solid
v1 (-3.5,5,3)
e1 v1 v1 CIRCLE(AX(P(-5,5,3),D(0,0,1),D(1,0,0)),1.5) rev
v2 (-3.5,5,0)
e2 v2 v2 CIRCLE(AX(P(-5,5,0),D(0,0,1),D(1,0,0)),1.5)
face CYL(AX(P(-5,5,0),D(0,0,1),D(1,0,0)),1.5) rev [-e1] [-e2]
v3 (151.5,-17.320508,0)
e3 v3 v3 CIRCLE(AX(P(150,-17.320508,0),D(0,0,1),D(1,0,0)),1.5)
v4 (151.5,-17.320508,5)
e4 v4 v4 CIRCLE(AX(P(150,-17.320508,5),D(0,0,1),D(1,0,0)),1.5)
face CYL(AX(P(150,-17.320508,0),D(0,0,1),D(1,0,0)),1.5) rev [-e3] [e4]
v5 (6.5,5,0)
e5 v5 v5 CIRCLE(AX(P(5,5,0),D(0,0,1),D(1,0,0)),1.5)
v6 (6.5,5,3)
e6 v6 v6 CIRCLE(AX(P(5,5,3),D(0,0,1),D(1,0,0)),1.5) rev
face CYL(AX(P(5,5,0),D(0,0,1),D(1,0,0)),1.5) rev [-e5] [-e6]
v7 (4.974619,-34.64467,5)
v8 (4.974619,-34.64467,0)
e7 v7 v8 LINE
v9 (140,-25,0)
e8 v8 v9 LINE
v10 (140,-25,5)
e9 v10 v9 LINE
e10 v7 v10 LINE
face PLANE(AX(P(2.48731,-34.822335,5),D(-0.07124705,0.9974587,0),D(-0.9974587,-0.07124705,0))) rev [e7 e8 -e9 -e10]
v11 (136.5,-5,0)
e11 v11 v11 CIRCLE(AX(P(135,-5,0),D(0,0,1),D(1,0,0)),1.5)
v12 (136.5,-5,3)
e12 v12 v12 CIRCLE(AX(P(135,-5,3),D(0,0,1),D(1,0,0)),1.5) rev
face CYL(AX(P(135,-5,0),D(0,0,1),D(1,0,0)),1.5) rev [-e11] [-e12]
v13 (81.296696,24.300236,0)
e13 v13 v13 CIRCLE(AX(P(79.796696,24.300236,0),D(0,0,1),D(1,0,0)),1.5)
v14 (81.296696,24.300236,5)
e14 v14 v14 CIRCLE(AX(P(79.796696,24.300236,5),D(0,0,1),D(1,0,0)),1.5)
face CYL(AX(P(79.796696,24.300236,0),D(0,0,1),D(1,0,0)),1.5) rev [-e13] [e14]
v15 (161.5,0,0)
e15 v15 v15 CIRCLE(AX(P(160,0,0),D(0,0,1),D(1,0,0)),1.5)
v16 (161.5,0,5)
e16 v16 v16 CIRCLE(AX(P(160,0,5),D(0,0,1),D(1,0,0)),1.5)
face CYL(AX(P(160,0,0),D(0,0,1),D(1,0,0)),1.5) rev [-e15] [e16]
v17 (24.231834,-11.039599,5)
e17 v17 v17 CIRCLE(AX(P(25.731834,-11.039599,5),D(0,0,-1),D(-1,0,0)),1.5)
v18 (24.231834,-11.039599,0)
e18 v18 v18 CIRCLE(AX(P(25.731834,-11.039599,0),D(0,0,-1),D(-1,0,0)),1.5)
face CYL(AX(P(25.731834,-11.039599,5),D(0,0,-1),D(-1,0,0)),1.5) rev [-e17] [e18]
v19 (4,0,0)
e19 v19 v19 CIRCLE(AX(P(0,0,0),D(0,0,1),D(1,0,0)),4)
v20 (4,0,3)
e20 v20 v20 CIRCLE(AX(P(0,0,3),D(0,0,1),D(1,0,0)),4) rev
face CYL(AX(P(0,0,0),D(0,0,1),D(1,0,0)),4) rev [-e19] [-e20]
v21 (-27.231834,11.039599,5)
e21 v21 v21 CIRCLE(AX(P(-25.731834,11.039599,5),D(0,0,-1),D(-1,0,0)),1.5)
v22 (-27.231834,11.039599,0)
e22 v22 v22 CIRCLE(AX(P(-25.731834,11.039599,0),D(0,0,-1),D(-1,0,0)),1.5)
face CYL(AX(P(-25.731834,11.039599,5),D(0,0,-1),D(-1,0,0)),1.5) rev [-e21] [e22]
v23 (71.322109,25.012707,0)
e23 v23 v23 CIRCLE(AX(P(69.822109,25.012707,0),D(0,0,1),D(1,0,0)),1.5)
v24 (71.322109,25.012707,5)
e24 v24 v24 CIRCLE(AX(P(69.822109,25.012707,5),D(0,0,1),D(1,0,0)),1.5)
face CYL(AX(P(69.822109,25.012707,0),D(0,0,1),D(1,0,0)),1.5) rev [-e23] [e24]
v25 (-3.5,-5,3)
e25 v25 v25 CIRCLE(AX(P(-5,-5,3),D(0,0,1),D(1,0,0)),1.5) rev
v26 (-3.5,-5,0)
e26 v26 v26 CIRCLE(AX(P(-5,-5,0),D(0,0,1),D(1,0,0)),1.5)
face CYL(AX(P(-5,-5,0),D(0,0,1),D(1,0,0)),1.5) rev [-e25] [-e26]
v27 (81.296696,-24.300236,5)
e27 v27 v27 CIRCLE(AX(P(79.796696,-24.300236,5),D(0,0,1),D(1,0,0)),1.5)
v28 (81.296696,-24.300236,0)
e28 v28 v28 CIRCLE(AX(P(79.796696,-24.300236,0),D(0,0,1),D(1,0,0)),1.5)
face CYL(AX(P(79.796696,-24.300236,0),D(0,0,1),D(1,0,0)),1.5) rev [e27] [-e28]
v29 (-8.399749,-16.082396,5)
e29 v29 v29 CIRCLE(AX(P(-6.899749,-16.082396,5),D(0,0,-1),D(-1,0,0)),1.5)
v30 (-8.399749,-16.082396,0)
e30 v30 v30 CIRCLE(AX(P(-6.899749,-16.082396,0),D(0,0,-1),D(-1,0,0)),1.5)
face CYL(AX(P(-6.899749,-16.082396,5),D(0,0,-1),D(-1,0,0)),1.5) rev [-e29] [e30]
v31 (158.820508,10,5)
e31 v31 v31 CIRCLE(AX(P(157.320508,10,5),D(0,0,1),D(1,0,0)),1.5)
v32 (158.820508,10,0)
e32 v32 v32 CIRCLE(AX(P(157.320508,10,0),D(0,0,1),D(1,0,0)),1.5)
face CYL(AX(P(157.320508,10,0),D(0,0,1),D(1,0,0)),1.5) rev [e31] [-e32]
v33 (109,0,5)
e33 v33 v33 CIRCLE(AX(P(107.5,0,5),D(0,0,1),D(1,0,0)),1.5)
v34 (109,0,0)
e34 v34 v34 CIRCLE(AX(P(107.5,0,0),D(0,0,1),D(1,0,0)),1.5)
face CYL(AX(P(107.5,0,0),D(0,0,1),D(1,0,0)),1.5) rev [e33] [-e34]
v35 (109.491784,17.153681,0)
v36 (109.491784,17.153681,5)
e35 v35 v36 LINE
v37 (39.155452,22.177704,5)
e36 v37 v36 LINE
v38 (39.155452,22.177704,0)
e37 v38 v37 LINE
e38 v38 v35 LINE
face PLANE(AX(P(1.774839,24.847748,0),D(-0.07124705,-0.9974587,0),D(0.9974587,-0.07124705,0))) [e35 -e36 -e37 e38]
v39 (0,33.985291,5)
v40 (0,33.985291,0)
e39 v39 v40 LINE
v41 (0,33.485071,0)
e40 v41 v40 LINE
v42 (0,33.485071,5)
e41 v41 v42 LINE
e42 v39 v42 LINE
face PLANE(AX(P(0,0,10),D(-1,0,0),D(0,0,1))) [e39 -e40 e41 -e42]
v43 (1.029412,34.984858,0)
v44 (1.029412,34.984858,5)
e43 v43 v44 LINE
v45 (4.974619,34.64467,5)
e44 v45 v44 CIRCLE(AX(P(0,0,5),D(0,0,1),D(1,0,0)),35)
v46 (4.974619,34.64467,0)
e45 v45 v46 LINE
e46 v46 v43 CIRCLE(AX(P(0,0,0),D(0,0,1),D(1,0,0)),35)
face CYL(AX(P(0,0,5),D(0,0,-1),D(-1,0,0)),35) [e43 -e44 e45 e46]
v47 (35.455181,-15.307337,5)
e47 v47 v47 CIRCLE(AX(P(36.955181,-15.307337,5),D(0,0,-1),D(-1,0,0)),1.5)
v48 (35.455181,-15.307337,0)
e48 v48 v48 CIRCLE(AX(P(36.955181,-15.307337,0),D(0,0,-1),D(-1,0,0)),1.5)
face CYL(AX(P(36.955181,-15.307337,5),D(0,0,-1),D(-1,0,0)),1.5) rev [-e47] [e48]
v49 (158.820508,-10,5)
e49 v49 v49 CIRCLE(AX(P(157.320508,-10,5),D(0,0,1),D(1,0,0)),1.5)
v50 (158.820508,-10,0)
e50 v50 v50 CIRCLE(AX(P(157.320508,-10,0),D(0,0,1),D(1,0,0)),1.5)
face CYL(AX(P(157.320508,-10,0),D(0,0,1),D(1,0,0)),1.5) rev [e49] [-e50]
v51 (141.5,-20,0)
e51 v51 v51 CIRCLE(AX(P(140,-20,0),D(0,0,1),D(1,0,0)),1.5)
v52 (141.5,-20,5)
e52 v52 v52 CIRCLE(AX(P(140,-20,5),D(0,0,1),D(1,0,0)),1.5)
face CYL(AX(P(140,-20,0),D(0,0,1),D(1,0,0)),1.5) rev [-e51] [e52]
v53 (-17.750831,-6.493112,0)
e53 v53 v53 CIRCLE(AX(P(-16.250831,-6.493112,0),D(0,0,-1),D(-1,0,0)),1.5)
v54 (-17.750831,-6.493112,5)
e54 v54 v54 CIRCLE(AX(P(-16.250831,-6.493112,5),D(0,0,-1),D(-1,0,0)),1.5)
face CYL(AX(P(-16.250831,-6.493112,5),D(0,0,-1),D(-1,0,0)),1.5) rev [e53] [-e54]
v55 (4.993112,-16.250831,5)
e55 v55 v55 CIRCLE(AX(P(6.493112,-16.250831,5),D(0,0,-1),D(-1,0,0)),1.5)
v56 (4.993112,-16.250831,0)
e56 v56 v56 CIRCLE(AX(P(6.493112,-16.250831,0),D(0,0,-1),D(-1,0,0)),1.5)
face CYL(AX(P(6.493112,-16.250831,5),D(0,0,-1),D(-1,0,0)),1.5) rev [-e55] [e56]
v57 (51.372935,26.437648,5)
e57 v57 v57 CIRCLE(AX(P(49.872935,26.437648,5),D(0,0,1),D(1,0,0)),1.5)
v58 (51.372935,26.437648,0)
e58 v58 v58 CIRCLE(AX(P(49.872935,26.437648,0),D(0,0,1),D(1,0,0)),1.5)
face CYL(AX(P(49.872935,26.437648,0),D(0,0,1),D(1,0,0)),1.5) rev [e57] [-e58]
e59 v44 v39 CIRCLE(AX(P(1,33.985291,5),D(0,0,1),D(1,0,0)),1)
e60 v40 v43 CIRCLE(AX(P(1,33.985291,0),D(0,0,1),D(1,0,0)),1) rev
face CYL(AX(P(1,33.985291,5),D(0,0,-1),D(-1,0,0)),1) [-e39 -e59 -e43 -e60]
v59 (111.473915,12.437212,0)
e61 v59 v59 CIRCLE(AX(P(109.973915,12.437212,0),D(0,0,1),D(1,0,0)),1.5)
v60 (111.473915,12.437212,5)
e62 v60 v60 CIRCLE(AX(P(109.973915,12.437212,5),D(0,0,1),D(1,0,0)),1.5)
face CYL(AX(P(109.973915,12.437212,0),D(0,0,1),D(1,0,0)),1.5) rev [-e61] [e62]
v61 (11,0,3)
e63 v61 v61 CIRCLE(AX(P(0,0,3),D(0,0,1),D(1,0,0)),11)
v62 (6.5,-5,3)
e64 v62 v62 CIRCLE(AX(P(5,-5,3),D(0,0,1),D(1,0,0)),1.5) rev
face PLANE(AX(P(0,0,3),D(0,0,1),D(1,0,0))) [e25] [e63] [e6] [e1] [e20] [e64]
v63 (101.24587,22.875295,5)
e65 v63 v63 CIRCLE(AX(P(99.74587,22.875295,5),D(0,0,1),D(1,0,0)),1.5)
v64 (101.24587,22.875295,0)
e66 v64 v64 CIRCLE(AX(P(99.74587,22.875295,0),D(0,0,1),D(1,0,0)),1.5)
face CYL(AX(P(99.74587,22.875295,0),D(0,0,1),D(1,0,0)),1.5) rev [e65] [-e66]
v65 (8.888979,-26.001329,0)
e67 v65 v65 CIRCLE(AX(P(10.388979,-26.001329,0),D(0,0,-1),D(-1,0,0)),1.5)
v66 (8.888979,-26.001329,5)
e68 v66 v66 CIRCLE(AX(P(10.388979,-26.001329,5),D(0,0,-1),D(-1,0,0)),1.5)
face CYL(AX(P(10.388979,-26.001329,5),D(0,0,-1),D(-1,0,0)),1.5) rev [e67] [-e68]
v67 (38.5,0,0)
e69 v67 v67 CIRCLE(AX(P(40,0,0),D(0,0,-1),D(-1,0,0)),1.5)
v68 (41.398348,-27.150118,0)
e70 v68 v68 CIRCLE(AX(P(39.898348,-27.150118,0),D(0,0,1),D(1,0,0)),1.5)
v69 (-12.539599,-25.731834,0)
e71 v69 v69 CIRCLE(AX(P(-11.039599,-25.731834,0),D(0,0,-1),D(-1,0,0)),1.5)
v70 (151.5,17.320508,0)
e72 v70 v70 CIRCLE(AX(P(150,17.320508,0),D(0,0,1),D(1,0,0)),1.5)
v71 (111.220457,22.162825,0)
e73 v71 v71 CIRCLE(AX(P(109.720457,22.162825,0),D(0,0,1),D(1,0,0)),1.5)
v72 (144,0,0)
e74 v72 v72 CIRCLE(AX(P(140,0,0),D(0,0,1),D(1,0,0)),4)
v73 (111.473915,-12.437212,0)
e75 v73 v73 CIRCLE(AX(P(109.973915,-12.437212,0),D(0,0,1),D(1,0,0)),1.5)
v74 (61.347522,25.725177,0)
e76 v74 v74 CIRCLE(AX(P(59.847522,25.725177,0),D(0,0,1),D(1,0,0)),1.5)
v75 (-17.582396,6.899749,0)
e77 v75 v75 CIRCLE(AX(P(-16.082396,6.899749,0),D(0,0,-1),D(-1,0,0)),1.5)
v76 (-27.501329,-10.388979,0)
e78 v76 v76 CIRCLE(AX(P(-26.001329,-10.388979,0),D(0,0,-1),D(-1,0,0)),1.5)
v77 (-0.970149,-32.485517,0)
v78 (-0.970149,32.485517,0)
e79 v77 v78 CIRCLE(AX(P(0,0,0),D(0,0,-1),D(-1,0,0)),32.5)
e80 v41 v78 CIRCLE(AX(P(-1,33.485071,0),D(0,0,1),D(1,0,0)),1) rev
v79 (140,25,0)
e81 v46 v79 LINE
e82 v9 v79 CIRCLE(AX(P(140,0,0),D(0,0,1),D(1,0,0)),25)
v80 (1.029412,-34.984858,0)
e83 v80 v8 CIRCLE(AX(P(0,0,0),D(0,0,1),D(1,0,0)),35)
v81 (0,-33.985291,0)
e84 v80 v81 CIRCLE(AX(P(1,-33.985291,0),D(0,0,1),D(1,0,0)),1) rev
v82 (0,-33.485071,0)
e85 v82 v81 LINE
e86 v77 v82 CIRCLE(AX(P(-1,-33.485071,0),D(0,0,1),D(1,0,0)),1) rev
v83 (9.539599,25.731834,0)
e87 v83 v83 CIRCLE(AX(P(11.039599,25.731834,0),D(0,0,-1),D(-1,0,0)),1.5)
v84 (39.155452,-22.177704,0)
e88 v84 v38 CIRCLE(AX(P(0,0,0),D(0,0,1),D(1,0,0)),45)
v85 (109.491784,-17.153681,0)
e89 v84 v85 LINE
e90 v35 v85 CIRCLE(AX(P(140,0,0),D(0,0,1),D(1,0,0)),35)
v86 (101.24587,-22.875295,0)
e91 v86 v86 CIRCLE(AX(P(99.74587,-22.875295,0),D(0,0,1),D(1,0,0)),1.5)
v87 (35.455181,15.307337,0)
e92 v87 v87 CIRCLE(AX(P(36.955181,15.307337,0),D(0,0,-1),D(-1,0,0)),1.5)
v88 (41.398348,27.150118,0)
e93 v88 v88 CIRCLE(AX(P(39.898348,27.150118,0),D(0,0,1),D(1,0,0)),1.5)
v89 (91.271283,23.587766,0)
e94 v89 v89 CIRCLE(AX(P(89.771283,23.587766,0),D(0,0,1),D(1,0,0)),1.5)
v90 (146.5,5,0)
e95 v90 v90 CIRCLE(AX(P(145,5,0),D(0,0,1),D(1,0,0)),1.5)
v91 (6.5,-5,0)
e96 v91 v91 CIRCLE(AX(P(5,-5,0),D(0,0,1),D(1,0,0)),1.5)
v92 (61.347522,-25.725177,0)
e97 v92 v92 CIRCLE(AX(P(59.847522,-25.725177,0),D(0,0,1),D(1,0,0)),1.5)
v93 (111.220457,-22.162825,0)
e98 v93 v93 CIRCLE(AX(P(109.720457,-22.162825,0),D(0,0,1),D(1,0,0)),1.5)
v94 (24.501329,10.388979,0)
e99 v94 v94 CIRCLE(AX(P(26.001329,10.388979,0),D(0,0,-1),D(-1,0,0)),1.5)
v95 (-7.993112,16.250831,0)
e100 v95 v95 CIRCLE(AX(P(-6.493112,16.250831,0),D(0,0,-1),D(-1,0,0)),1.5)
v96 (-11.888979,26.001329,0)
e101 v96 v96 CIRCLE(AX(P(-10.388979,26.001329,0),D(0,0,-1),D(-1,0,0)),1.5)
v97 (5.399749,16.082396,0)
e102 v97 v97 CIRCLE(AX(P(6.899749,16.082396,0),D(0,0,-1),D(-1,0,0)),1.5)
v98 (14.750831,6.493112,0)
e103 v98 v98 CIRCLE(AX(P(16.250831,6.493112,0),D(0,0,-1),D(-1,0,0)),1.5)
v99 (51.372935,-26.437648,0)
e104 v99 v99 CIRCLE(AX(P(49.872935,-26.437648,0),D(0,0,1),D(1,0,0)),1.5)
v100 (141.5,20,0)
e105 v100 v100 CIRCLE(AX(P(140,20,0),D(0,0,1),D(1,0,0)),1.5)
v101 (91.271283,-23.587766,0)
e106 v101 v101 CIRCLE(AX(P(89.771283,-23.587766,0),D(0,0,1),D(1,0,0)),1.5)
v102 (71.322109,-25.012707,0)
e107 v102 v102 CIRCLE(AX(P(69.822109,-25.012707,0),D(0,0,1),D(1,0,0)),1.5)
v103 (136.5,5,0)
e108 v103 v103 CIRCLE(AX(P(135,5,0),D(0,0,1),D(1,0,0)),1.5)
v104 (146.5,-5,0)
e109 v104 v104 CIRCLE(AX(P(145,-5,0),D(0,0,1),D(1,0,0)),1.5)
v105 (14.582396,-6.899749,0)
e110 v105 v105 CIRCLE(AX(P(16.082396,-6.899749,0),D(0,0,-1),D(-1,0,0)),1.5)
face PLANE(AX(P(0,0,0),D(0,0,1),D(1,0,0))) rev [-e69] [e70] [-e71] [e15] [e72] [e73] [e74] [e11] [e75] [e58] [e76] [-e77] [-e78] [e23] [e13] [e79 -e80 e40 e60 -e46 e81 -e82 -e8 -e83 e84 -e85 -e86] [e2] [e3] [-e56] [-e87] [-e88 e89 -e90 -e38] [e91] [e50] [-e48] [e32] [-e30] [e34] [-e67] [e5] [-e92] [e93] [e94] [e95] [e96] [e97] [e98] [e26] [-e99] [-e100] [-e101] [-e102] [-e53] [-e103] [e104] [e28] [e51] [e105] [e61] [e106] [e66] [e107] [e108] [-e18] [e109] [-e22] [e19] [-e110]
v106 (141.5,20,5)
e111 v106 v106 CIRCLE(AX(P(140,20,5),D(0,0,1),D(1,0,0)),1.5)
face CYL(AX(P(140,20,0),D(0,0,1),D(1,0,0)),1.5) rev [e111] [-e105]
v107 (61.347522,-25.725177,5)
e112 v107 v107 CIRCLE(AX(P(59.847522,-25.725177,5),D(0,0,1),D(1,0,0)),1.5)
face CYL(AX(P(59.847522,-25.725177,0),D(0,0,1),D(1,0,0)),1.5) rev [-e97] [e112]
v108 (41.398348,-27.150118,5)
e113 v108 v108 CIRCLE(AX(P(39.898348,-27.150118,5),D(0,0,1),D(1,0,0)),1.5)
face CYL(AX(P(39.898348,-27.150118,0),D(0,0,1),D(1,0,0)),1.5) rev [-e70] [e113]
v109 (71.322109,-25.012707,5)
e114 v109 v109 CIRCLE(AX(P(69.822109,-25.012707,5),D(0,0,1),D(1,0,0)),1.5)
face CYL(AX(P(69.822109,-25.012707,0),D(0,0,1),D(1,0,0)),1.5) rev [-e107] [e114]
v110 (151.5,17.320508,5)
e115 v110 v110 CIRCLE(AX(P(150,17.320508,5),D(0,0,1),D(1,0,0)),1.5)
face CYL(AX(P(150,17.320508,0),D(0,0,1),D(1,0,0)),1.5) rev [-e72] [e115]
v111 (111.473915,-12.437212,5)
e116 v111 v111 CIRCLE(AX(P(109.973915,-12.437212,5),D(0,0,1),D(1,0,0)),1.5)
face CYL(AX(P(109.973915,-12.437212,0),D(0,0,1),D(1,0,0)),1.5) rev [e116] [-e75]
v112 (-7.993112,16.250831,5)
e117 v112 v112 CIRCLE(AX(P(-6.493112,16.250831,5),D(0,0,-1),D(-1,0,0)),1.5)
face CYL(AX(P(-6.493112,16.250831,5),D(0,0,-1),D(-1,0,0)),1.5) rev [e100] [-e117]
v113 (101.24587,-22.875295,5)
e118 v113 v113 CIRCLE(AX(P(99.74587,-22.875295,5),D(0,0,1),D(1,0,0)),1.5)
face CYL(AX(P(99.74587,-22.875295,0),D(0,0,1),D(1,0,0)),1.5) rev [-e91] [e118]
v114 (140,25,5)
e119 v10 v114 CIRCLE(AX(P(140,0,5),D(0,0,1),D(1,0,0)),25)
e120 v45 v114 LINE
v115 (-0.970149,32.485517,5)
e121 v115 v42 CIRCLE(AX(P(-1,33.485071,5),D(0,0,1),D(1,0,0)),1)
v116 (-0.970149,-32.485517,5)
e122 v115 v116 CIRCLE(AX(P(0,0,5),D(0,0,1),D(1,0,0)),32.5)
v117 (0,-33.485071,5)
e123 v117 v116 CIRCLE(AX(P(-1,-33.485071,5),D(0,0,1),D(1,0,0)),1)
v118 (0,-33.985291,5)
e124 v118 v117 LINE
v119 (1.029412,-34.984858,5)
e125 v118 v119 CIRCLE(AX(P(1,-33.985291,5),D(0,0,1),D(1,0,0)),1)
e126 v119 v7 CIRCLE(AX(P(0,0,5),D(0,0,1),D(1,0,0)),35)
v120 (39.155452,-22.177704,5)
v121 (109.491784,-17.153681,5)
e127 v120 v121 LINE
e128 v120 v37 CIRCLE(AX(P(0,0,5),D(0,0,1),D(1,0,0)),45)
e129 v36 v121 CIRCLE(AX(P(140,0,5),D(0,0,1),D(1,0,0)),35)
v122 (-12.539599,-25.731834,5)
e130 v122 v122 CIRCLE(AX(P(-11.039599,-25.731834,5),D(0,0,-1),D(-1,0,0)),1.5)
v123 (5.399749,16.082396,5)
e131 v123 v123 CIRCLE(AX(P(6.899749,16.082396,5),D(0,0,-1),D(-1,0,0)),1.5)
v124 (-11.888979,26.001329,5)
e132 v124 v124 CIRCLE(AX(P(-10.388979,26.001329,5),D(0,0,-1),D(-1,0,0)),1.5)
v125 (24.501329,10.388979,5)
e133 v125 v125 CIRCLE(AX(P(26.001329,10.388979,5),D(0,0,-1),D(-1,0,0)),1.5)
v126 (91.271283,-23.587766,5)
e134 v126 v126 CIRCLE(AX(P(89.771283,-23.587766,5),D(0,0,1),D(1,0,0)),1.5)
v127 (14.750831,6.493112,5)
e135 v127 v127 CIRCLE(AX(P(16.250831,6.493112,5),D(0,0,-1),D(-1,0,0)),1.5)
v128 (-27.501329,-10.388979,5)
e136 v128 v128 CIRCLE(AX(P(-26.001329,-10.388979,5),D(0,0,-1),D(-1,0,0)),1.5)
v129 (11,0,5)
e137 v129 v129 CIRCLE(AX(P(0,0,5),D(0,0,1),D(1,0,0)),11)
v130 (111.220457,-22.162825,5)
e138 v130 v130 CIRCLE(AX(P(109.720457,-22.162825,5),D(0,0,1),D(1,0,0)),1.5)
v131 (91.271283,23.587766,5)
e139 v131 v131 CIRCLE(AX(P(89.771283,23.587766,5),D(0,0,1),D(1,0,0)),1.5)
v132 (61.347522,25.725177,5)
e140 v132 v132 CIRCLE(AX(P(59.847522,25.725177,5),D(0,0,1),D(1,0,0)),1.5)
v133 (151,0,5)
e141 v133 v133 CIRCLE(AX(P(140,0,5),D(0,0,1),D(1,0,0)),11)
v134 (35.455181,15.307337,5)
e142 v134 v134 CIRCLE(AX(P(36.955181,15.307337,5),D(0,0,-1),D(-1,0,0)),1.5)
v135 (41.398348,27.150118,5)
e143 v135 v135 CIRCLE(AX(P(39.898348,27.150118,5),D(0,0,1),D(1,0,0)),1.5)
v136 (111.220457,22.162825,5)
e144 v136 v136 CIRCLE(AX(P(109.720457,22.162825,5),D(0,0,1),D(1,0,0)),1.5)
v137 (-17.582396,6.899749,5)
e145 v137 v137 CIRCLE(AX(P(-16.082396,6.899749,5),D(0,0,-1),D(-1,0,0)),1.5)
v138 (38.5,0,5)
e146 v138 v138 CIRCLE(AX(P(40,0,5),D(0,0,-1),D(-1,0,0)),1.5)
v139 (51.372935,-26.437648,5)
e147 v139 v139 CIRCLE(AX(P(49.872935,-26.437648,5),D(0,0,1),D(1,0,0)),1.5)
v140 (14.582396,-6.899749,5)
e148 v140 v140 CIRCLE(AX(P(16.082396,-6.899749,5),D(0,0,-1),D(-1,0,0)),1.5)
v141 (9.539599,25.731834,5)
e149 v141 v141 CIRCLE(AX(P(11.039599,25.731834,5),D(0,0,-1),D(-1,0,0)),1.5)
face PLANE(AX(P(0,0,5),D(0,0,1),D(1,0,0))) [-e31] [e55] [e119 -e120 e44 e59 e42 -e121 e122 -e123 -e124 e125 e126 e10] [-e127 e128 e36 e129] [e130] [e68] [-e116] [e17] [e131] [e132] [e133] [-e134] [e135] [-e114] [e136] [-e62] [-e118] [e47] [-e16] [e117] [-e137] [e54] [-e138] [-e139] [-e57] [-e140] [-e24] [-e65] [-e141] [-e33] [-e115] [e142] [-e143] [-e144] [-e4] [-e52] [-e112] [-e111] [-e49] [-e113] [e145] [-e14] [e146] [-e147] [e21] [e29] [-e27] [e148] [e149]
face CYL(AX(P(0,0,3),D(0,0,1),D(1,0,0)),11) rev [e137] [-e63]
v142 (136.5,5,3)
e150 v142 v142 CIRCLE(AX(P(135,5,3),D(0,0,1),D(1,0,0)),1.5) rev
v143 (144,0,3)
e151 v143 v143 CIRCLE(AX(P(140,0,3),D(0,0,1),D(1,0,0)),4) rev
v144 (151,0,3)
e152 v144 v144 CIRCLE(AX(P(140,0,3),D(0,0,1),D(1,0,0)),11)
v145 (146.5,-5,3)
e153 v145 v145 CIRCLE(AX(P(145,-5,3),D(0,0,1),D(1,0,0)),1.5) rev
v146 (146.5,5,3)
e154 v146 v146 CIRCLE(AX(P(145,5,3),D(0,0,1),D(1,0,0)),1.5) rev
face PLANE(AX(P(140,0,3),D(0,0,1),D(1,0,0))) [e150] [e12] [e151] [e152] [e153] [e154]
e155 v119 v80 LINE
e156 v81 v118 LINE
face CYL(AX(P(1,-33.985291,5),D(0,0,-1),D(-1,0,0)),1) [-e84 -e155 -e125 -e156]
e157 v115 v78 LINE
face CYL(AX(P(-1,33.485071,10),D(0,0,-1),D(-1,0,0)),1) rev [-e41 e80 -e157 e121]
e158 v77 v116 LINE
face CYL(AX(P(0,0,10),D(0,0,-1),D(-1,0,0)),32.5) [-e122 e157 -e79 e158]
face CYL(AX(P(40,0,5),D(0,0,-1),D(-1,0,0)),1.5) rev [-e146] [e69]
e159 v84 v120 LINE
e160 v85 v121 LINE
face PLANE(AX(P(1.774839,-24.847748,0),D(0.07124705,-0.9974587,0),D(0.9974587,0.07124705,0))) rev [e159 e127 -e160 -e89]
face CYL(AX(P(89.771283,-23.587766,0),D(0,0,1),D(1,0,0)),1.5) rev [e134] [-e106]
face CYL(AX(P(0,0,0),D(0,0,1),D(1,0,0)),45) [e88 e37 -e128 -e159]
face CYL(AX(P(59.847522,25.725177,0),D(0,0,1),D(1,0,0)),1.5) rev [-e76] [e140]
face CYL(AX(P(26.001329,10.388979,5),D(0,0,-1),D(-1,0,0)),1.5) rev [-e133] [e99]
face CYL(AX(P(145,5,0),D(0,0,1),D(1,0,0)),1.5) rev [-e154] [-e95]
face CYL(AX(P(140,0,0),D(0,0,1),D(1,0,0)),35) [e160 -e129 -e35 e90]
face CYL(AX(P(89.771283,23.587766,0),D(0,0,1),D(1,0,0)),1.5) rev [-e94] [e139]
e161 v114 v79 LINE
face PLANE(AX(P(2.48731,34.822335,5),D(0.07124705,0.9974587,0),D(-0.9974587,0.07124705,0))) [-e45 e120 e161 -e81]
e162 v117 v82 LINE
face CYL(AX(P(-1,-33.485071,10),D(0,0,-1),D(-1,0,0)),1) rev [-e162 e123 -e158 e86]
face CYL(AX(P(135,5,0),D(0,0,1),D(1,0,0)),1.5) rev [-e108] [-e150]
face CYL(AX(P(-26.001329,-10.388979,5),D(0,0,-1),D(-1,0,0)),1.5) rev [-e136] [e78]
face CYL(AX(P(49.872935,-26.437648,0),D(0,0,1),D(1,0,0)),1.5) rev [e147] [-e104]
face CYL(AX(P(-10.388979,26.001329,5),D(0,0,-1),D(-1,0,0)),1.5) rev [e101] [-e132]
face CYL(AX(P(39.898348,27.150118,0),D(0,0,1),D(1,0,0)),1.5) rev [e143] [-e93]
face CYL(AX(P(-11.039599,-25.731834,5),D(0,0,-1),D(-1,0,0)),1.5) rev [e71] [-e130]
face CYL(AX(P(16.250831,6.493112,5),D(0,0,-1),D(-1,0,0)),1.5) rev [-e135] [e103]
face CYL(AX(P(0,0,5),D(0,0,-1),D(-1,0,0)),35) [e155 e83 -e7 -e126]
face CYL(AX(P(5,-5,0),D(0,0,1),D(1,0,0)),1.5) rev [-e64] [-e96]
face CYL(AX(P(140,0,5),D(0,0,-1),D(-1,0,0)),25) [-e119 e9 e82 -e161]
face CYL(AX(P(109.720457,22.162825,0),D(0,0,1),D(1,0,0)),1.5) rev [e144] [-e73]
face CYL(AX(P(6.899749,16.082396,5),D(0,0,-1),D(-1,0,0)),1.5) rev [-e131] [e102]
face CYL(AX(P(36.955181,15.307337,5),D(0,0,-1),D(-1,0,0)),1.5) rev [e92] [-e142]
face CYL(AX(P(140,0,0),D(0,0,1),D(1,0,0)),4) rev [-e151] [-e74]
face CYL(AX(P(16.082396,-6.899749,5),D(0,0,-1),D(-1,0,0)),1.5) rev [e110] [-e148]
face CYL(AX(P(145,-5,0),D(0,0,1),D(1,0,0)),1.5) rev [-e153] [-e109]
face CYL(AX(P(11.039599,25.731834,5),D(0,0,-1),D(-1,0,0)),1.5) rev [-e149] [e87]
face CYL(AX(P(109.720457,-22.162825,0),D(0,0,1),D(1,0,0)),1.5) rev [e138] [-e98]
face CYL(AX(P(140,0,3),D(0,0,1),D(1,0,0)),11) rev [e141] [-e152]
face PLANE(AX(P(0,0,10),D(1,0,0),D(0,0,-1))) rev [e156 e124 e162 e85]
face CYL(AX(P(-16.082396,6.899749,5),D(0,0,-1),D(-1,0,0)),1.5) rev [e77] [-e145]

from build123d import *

# Parameters (mm, degrees)
EXTRUDE_3_DEPTH      = 5
SKETCH_4_R           = 4
SKETCH_4_R_2         = 1.5
CUT_EXTRUDE_3_DEPTH  = 5
SKETCH_5_R           = 11
CUT_EXTRUDE_4_DEPTH  = 2
SKETCH_6_R           = 1.5
CUT_EXTRUDE_6_DEPTH  = 169.745370307
SKETCH_8_R           = 1.5
CUT_EXTRUDE_8_DEPTH  = 169.745370307
SKETCH_9_R           = 1.5
EXTRUDE_4_DEPTH      = 5
SKETCH_10_R          = 1.5
EXTRUDE_6_DEPTH      = 5
SKETCH_11_R          = 1.5
EXTRUDE_12_DEPTH     = 5
SKETCH_14_R          = 1.5
CUT_EXTRUDE_9_DEPTH  = 5
EXTRUDE_START        = -5
EXTRUDE_13_DEPTH     = 5
SKETCH_16_R          = 1.5
CUT_EXTRUDE_10_DEPTH = 5
EXTRUDE_14_DEPTH     = 5
SKETCH_19_R          = 1.5
EXTRUDE_15_DEPTH     = 5
SKETCH_20_R          = 1.5
CUT_EXTRUDE_11_DEPTH = 5
EXTRUDE_16_DEPTH     = 5
SKETCH_22_R          = 1.5
EXTRUDE_17_DEPTH     = 5
SKETCH_23_R          = 1.5
CUT_EXTRUDE_15_DEPTH = 5
SKETCH_24_R          = 1.5
EXTRUDE_21_DEPTH     = 5
EXTRUDE_22_DEPTH     = 5
CUT_EXTRUDE_START    = -10
CUT_EXTRUDE_16_DEPTH = 10
FILLET_5_R           = 1
FILLET_6_R           = 1
FILLET_7_R           = 1
FILLET_8_R           = 1


with BuildPart() as part:
    # 草图1 → 凸台-拉伸3 (new body)
    with BuildSketch(Plane.XY):
        with BuildLine():
            Line((140, 25), (0, 35))
            ThreePointArc((0, 35), (-35, 0), (0, -35))
            Line((0, -35), (140, -25))
            ThreePointArc((140, -25), (165, 0), (140, 25))
        make_face()
    extrude(amount=EXTRUDE_3_DEPTH)

    # 草图4 → 切除-拉伸3 (cut)
    with BuildSketch(Plane.XY.offset(5)):
        with Locations((140, 0)):
            Circle(SKETCH_4_R)
        Circle(SKETCH_4_R)
        with BuildLine():
            Line((-5, -3.5), (-5, -5))
            Line((-5, -5), (-3.5, -5))
            ThreePointArc((-3.5, -5), (-3.939339828, -3.939339828), (-5, -3.5))
        make_face()
        with BuildLine():
            Line((-3.5, -5), (-5, -5))
            Line((-5, -5), (-5, -3.5))
            ThreePointArc((-5, -3.5), (-6.060660172, -6.060660172), (-3.5, -5))
        make_face()
        with Locations((135, 5)):
            Circle(SKETCH_4_R_2)
        with Locations((135, -5)):
            Circle(SKETCH_4_R_2)
        with Locations((145, -5)):
            Circle(SKETCH_4_R_2)
        with Locations((145, 5)):
            Circle(SKETCH_4_R_2)
        with Locations((-5, 5)):
            Circle(SKETCH_4_R_2)
        with Locations((5, 5)):
            Circle(SKETCH_4_R_2)
        with Locations((5, -5)):
            Circle(SKETCH_4_R_2)
    extrude(amount=-CUT_EXTRUDE_3_DEPTH, mode=Mode.SUBTRACT)

    # 草图5 → 切除-拉伸4 (cut)
    with BuildSketch(Plane.XY.offset(5)):
        Circle(SKETCH_5_R)
        with Locations((140, 0)):
            Circle(SKETCH_5_R)
    extrude(amount=-CUT_EXTRUDE_4_DEPTH, mode=Mode.SUBTRACT)

    # 草图6 → 切除-拉伸6 (cut, through all)
    with BuildSketch(Plane.XY.offset(5)):
        with Locations((0, 30)):
            Circle(SKETCH_6_R)
        with Locations((15, 25.980762114)):
            Circle(SKETCH_6_R)
        with Locations((25.980762114, 15)):
            Circle(SKETCH_6_R)
        with Locations((30, 0)):
            Circle(SKETCH_6_R)
        with Locations((25.980762114, -15)):
            Circle(SKETCH_6_R)
        with Locations((15, -25.980762114)):
            Circle(SKETCH_6_R)
        with Locations((0, -30)):
            Circle(SKETCH_6_R)
        with Locations((-15, -25.980762114)):
            Circle(SKETCH_6_R)
        with Locations((-25.980762114, -15)):
            Circle(SKETCH_6_R)
        with Locations((-30, 0)):
            Circle(SKETCH_6_R)
        with Locations((-25.980762114, 15)):
            Circle(SKETCH_6_R)
        with Locations((-15, 25.980762114)):
            Circle(SKETCH_6_R)
        with Locations((140, 20)):
            Circle(SKETCH_6_R)
        with Locations((150, 17.320508076)):
            Circle(SKETCH_6_R)
        with Locations((157.320508076, 10)):
            Circle(SKETCH_6_R)
        with Locations((160, 0)):
            Circle(SKETCH_6_R)
        with Locations((157.320508076, -10)):
            Circle(SKETCH_6_R)
        with Locations((150, -17.320508076)):
            Circle(SKETCH_6_R)
        with Locations((140, -20)):
            Circle(SKETCH_6_R)
        with Locations((130, -17.320508076)):
            Circle(SKETCH_6_R)
        with Locations((122.679491924, -10)):
            Circle(SKETCH_6_R)
        with Locations((120, 0)):
            Circle(SKETCH_6_R)
        with Locations((122.679491924, 10)):
            Circle(SKETCH_6_R)
        with Locations((130, 17.320508076)):
            Circle(SKETCH_6_R)
    extrude(amount=-CUT_EXTRUDE_6_DEPTH, mode=Mode.SUBTRACT)

    # 草图8 → 切除-拉伸8 (cut, through all)
    with BuildSketch(Plane.XY.offset(5)):
        with BuildLine():
            ThreePointArc((35, 0), (32.752250408, -12.340587232), (26.297708958, -23.096114469))
            Line((26.297708958, -23.096114469), (121.06763386, -16.326834119))
            ThreePointArc((121.06763386, -16.326834119), (115, 0), (121.06763386, 16.326834119))
            Line((121.06763386, 16.326834119), (26.297708958, 23.096114469))
            ThreePointArc((26.297708958, 23.096114469), (32.752250408, 12.340587232), (35, 0))
        make_face()
        with BuildLine():
            ThreePointArc((41.39357706, -27.03057705), (39.791477418, -25.653929951), (38.401308325, -27.244310531))
            Line((38.401308325, -27.244310531), (41.39357706, -27.03057705))
        make_face()
        with BuildLine():
            Line((41.39357706, -27.03057705), (38.401308325, -27.244310531))
            ThreePointArc((38.401308325, -27.244310531), (39.945467513, -28.649377735), (41.398347993, -27.150118))
            ThreePointArc((41.398347993, -27.150118), (41.397154785, -27.090299942), (41.39357706, -27.03057705))
        make_face()
        with Locations((9.974586998, 29.2875295)):
            Circle(SKETCH_8_R)
        with Locations((19.949173997, 28.575059)):
            Circle(SKETCH_8_R)
        with Locations((29.923760995, 27.8625885)):
            Circle(SKETCH_8_R)
        with Locations((39.898347993, 27.150118)):
            Circle(SKETCH_8_R)
        with Locations((49.872934992, 26.437647501)):
            Circle(SKETCH_8_R)
        with Locations((59.84752199, 25.725177001)):
            Circle(SKETCH_8_R)
        with Locations((69.822108988, 25.012706501)):
            Circle(SKETCH_8_R)
        with Locations((89.771282985, 23.587765501)):
            Circle(SKETCH_8_R)
        with Locations((79.796695986, 24.300236001)):
            Circle(SKETCH_8_R)
        with Locations((99.745869983, 22.875295001)):
            Circle(SKETCH_8_R)
        with Locations((109.720456981, 22.162824501)):
            Circle(SKETCH_8_R)
        with Locations((119.69504398, 21.450354001)):
            Circle(SKETCH_8_R)
        with Locations((129.669630978, 20.737883502)):
            Circle(SKETCH_8_R)
        with Locations((129.669630978, -20.737883502)):
            Circle(SKETCH_8_R)
        with Locations((119.69504398, -21.450354001)):
            Circle(SKETCH_8_R)
        with Locations((109.720456981, -22.162824501)):
            Circle(SKETCH_8_R)
        with Locations((99.745869983, -22.875295001)):
            Circle(SKETCH_8_R)
        with Locations((89.771282985, -23.587765501)):
            Circle(SKETCH_8_R)
        with Locations((79.796695986, -24.300236001)):
            Circle(SKETCH_8_R)
        with Locations((69.822108988, -25.012706501)):
            Circle(SKETCH_8_R)
        with Locations((59.84752199, -25.725177001)):
            Circle(SKETCH_8_R)
        with Locations((49.872934992, -26.437647501)):
            Circle(SKETCH_8_R)
        with Locations((29.923760995, -27.8625885)):
            Circle(SKETCH_8_R)
        with Locations((19.949173997, -28.575059)):
            Circle(SKETCH_8_R)
        with Locations((9.974586998, -29.2875295)):
            Circle(SKETCH_8_R)
    extrude(amount=-CUT_EXTRUDE_8_DEPTH, mode=Mode.SUBTRACT)

    # 草图9 → 凸台-拉伸4 (add)
    with BuildSketch(Plane.XY.offset(5)):
        with Locations((15, 25.980762114)):
            Circle(SKETCH_9_R)
        with Locations((15, -25.980762114)):
            Circle(SKETCH_9_R)
    extrude(amount=-EXTRUDE_4_DEPTH)

    # 草图10 → 凸台-拉伸6 (add)
    with BuildSketch(Plane.XY.offset(5)):
        with Locations((130, -17.320508076)):
            Circle(SKETCH_10_R)
        with Locations((130, 17.320508076)):
            Circle(SKETCH_10_R)
    extrude(amount=-EXTRUDE_6_DEPTH)

    # 草图11 → 凸台-拉伸12 (add)
    with BuildSketch(Plane.XY.offset(5)):
        with Locations((25.980762114, -15)):
            Circle(SKETCH_11_R)
        with Locations((30, 0)):
            Circle(SKETCH_11_R)
        with Locations((25.980762114, 15)):
            Circle(SKETCH_11_R)
        with Locations((119.69504398, 21.450354001)):
            Circle(SKETCH_11_R)
        with Locations((119.69504398, -21.450354001)):
            Circle(SKETCH_11_R)
        with Locations((29.923760995, -27.8625885)):
            Circle(SKETCH_11_R)
        with Locations((29.923760995, 27.8625885)):
            Circle(SKETCH_11_R)
        with Locations((19.949173997, 28.575059)):
            Circle(SKETCH_11_R)
        with Locations((19.949173997, -28.575059)):
            Circle(SKETCH_11_R)
        with BuildLine():
            Line((0, 35), (4.974619289, 34.644670051))
            ThreePointArc((4.974619289, 34.644670051), (2.49364675, 34.911054494), (0, 35))
        make_face()
        with BuildLine():
            ThreePointArc((0, -35), (2.49364675, -34.911054494), (4.974619289, -34.644670051))
            Line((4.974619289, -34.644670051), (0, -35))
        make_face()
        with Locations((129.669630978, -20.737883502)):
            Circle(SKETCH_11_R)
        with Locations((129.669630978, 20.737883502)):
            Circle(SKETCH_11_R)
        with Locations((-15, -25.980762114)):
            Circle(SKETCH_11_R)
        with Locations((0, -30)):
            Circle(SKETCH_11_R)
        with Locations((9.974586998, -29.2875295)):
            Circle(SKETCH_11_R)
        with Locations((-25.980762114, -15)):
            Circle(SKETCH_11_R)
        with Locations((-30, 0)):
            Circle(SKETCH_11_R)
        with Locations((-25.980762114, 15)):
            Circle(SKETCH_11_R)
        with Locations((-15, 25.980762114)):
            Circle(SKETCH_11_R)
        with Locations((0, 30)):
            Circle(SKETCH_11_R)
        with Locations((9.974586998, 29.2875295)):
            Circle(SKETCH_11_R)
    extrude(amount=-EXTRUDE_12_DEPTH)

    # 草图14 → 切除-拉伸9 (cut)
    with BuildSketch(Plane(origin=(0, 0, 0), x_dir=(-1, 0, 0), z_dir=(0, 0, -1))):
        with Locations((-11.039598696, 25.731833604)):
            Circle(SKETCH_14_R)
        with Locations((-6.899749185, 16.082396003)):
            Circle(SKETCH_14_R)
        with Locations((6.493111834, 16.250830708)):
            Circle(SKETCH_14_R)
        with Locations((10.388978935, 26.001329133)):
            Circle(SKETCH_14_R)
        with Locations((16.082396003, 6.899749185)):
            Circle(SKETCH_14_R)
        with Locations((25.731833604, 11.039598696)):
            Circle(SKETCH_14_R)
        with Locations((16.250830708, -6.493111834)):
            Circle(SKETCH_14_R)
        with Locations((26.001329133, -10.388978935)):
            Circle(SKETCH_14_R)
        with Locations((6.899749185, -16.082396003)):
            Circle(SKETCH_14_R)
        with Locations((11.039598696, -25.731833604)):
            Circle(SKETCH_14_R)
        with Locations((-6.493111834, -16.250830708)):
            Circle(SKETCH_14_R)
        with Locations((-10.388978935, -26.001329133)):
            Circle(SKETCH_14_R)
        with Locations((-16.082396003, -6.899749185)):
            Circle(SKETCH_14_R)
        with Locations((-25.731833604, -11.039598696)):
            Circle(SKETCH_14_R)
        with Locations((-16.250830708, 6.493111834)):
            Circle(SKETCH_14_R)
        with Locations((-26.001329133, 10.388978935)):
            Circle(SKETCH_14_R)
    extrude(amount=-CUT_EXTRUDE_9_DEPTH, mode=Mode.SUBTRACT)

    # 草图15 → 凸台-拉伸13 (add)
    with BuildSketch(Plane(origin=(0, 0, 0), x_dir=(-1, 0, 0), z_dir=(0, 0, -1)).offset(EXTRUDE_START)):
        with BuildLine():
            Line((-32.991302599, -22.618000638), (-26.297708958, -23.096114469))
            ThreePointArc((-26.297708958, -23.096114469), (-35, 0), (-26.297708958, 23.096114469))
            Line((-26.297708958, 23.096114469), (-32.991302599, 22.618000638))
            ThreePointArc((-32.991302599, 22.618000638), (-40, 0), (-32.991302599, -22.618000638))
        make_face()
    extrude(amount=EXTRUDE_13_DEPTH)

    # 草图16 → 切除-拉伸10 (cut)
    with BuildSketch(Plane(origin=(0, 0, 0), x_dir=(-1, 0, 0), z_dir=(0, 0, -1))):
        with Locations((-35, 0)):
            Circle(SKETCH_16_R)
        with Locations((-32.335783638, 13.393920133)):
            Circle(SKETCH_16_R)
        with Locations((-32.335783638, -13.393920133)):
            Circle(SKETCH_16_R)
    extrude(amount=-CUT_EXTRUDE_10_DEPTH, mode=Mode.SUBTRACT)

    # 草图18 → 凸台-拉伸14 (add)
    with BuildSketch(Plane.XY.offset(5)):
        with BuildLine():
            Line((39.15545217, 22.17770424), (32.991302599, 22.618000638))
            ThreePointArc((32.991302599, 22.618000638), (38.207670067, 11.83950793), (40, 0))
            ThreePointArc((40, 0), (38.207670067, -11.83950793), (32.991302599, -22.618000638))
            Line((32.991302599, -22.618000638), (39.15545217, -22.17770424))
            ThreePointArc((39.15545217, -22.17770424), (43.514338715, -11.467446366), (45, 0))
            ThreePointArc((45, 0), (43.514338715, 11.467446366), (39.15545217, 22.17770424))
        make_face()
    extrude(amount=-EXTRUDE_14_DEPTH)

    # 草图19 → 凸台-拉伸15 (add)
    with BuildSketch(Plane.XY.offset(5).offset(EXTRUDE_START)):
        with Locations((32.335783638, 13.393920133)):
            Circle(SKETCH_19_R)
        with Locations((35, 0)):
            Circle(SKETCH_19_R)
        with Locations((32.335783638, -13.393920133)):
            Circle(SKETCH_19_R)
    extrude(amount=EXTRUDE_15_DEPTH)

    # 草图20 → 切除-拉伸11 (cut)
    with BuildSketch(Plane(origin=(0, 0, 0), x_dir=(-1, 0, 0), z_dir=(0, 0, -1))):
        with Locations((-40, 0)):
            Circle(SKETCH_20_R)
        with Locations((-36.9551813, 15.307337295)):
            Circle(SKETCH_20_R)
        with Locations((-15.307337295, 36.9551813)):
            Circle(SKETCH_20_R)
        with Locations((0, 40)):
            Circle(SKETCH_20_R)
        with Locations((15.307337295, 36.9551813)):
            Circle(SKETCH_20_R)
        with Locations((28.284271247, 28.284271247)):
            Circle(SKETCH_20_R)
        with Locations((36.9551813, 15.307337295)):
            Circle(SKETCH_20_R)
        with Locations((40, 0)):
            Circle(SKETCH_20_R)
        with Locations((36.9551813, -15.307337295)):
            Circle(SKETCH_20_R)
        with Locations((28.284271247, -28.284271247)):
            Circle(SKETCH_20_R)
        with Locations((15.307337295, -36.9551813)):
            Circle(SKETCH_20_R)
        with Locations((0, -40)):
            Circle(SKETCH_20_R)
        with Locations((-15.307337295, -36.9551813)):
            Circle(SKETCH_20_R)
        with Locations((-36.9551813, -15.307337295)):
            Circle(SKETCH_20_R)
    extrude(amount=-CUT_EXTRUDE_11_DEPTH, mode=Mode.SUBTRACT)

    # 草图21 → 凸台-拉伸16 (add)
    with BuildSketch(Plane(origin=(0, 0, 0), x_dir=(-1, 0, 0), z_dir=(0, 0, -1))):
        with BuildLine():
            Line((-118.032774953, 16.543609755), (-121.06763386, 16.326834119))
            ThreePointArc((-121.06763386, 16.326834119), (-116.565952617, 8.70892779), (-115, 0))
            ThreePointArc((-115, 0), (-116.565952617, -8.70892779), (-121.06763386, -16.326834119))
            Line((-121.06763386, -16.326834119), (-118.032774953, -16.543609755))
            ThreePointArc((-118.032774953, -16.543609755), (-113.919847692, -8.722135954), (-112.5, 0))
            ThreePointArc((-112.5, 0), (-113.919847692, 8.722135954), (-118.032774953, 16.543609755))
        make_face()
        with BuildLine():
            Line((-115.112957921, 16.752168115), (-118.032774953, 16.543609755))
            ThreePointArc((-118.032774953, 16.543609755), (-113.919847692, 8.722135954), (-112.5, 0))
            ThreePointArc((-112.5, 0), (-113.919847692, -8.722135954), (-118.032774953, -16.543609755))
            Line((-118.032774953, -16.543609755), (-115.112957921, -16.752168115))
            ThreePointArc((-115.112957921, -16.752168115), (-111.306697102, -8.757532119), (-110, 0))
            ThreePointArc((-110, 0), (-111.306697102, 8.757532119), (-115.112957921, 16.752168115))
        make_face()
    extrude(amount=-EXTRUDE_16_DEPTH)

    # 草图22 → 凸台-拉伸17 (add)
    with BuildSketch(Plane.XY.offset(5)):
        with Locations((122.679491924, 10)):
            Circle(SKETCH_22_R)
        with Locations((120, 0)):
            Circle(SKETCH_22_R)
        with Locations((122.679491924, -10)):
            Circle(SKETCH_22_R)
    extrude(amount=-EXTRUDE_17_DEPTH)

    # 草图23 → 切除-拉伸15 (cut)
    with BuildSketch(Plane.XY.offset(5)):
        with Locations((112.5, 0)):
            Circle(SKETCH_23_R)
        with Locations((116.184301396, 13.75)):
            Circle(SKETCH_23_R)
        with Locations((116.184301396, -13.75)):
            Circle(SKETCH_23_R)
    extrude(amount=-CUT_EXTRUDE_15_DEPTH, mode=Mode.SUBTRACT)

    # 草图24 → 凸台-拉伸21 (add)
    with BuildSketch(Plane.XY.offset(5)):
        with Locations((116.184301396, 13.75)):
            Circle(SKETCH_24_R)
        with Locations((112.5, 0)):
            Circle(SKETCH_24_R)
        with Locations((116.184301396, -13.75)):
            Circle(SKETCH_24_R)
    extrude(amount=-EXTRUDE_21_DEPTH)

    # 草图29 → 凸台-拉伸22 (add)
    with BuildSketch(Plane.XY.offset(5).offset(EXTRUDE_START)):
        with BuildLine():
            ThreePointArc((115.112957921, -16.752168115), (110, 0), (115.112957921, 16.752168115))
            Line((115.112957921, 16.752168115), (112.273160836, 16.955010763))
            ThreePointArc((112.273160836, 16.955010763), (111.38321068, 15.405498012), (110.57976792, 13.809415062))
            ThreePointArc((110.57976792, 13.809415062), (111.230652853, 13.256119639), (111.473915193, 12.437211552))
            ThreePointArc((111.473915193, 12.437211552), (110.821606837, 11.19970645), (109.432023357, 11.038514573))
            ThreePointArc((109.432023357, 11.038514573), (108.124478387, 6.340435466), (107.534615385, 1.499600539))
            ThreePointArc((107.534615385, 1.499600539), (108.572828755, 1.048350352), (109, 0))
            ThreePointArc((109, 0), (108.572828755, -1.048350352), (107.534615385, -1.499600539))
            ThreePointArc((107.534615385, -1.499600539), (108.124478387, -6.340435466), (109.432023357, -11.038514573))
            ThreePointArc((109.432023357, -11.038514573), (110.821606837, -11.19970645), (111.473915193, -12.437211552))
            ThreePointArc((111.473915193, -12.437211552), (111.230652853, -13.256119639), (110.57976792, -13.809415062))
            ThreePointArc((110.57976792, -13.809415062), (111.38321068, -15.405498012), (112.273160836, -16.955010763))
            Line((112.273160836, -16.955010763), (115.112957921, -16.752168115))
        make_face()
        with BuildLine():
            ThreePointArc((110.57976792, 13.809415062), (111.38321068, 15.405498012), (112.273160836, 16.955010763))
            Line((112.273160836, 16.955010763), (109.491783992, 17.153680538))
            ThreePointArc((109.491783992, 17.153680538), (105, 0), (109.491783992, -17.153680538))
            Line((109.491783992, -17.153680538), (112.273160836, -16.955010763))
            ThreePointArc((112.273160836, -16.955010763), (111.38321068, -15.405498012), (110.57976792, -13.809415062))
            ThreePointArc((110.57976792, -13.809415062), (108.588095895, -13.0112367), (109.432023357, -11.038514573))
            ThreePointArc((109.432023357, -11.038514573), (108.124478387, -6.340435466), (107.534615385, -1.499600539))
            ThreePointArc((107.534615385, -1.499600539), (106, 0), (107.534615385, 1.499600539))
            ThreePointArc((107.534615385, 1.499600539), (108.124478387, 6.340435466), (109.432023357, 11.038514573))
            ThreePointArc((109.432023357, 11.038514573), (108.588095895, 13.0112367), (110.57976792, 13.809415062))
        make_face()
    extrude(amount=EXTRUDE_22_DEPTH)

    # 草图30 → 切除-拉伸16 (cut)
    with BuildSketch(Plane(origin=(0, 0, 0), x_dir=(-1, 0, 0), z_dir=(0, 0, -1)).offset(CUT_EXTRUDE_START)):
        with BuildLine():
            Line((0, 35), (0, 32.5))
            ThreePointArc((0, 32.5), (22.980970389, 22.980970389), (32.5, 0))
            ThreePointArc((32.5, 0), (22.980970389, -22.980970389), (0, -32.5))
            Line((0, -32.5), (0, -35))
            ThreePointArc((0, -35), (24.748737342, -24.748737342), (35, 0))
            ThreePointArc((35, 0), (24.748737342, 24.748737342), (0, 35))
        make_face()
    extrude(amount=CUT_EXTRUDE_16_DEPTH, mode=Mode.SUBTRACT)

    # 圆角5
    fillet_5_edges = [part.edges().sort_by_distance(p)[0] for p in [
        (0, 35, 2.5),
    ]]
    fillet(fillet_5_edges, radius=FILLET_5_R)

    # 圆角6
    fillet_6_edges = [part.edges().sort_by_distance(p)[0] for p in [
        (0, -35, 2.5),
    ]]
    fillet(fillet_6_edges, radius=FILLET_6_R)

    # 圆角7
    fillet_7_edges = [part.edges().sort_by_distance(p)[0] for p in [
        (0, -32.5, 2.5),
    ]]
    fillet(fillet_7_edges, radius=FILLET_7_R)

    # 圆角8
    fillet_8_edges = [part.edges().sort_by_distance(p)[0] for p in [
        (0, 32.5, 2.5),
    ]]
    fillet(fillet_8_edges, radius=FILLET_8_R)


solid = part.part
